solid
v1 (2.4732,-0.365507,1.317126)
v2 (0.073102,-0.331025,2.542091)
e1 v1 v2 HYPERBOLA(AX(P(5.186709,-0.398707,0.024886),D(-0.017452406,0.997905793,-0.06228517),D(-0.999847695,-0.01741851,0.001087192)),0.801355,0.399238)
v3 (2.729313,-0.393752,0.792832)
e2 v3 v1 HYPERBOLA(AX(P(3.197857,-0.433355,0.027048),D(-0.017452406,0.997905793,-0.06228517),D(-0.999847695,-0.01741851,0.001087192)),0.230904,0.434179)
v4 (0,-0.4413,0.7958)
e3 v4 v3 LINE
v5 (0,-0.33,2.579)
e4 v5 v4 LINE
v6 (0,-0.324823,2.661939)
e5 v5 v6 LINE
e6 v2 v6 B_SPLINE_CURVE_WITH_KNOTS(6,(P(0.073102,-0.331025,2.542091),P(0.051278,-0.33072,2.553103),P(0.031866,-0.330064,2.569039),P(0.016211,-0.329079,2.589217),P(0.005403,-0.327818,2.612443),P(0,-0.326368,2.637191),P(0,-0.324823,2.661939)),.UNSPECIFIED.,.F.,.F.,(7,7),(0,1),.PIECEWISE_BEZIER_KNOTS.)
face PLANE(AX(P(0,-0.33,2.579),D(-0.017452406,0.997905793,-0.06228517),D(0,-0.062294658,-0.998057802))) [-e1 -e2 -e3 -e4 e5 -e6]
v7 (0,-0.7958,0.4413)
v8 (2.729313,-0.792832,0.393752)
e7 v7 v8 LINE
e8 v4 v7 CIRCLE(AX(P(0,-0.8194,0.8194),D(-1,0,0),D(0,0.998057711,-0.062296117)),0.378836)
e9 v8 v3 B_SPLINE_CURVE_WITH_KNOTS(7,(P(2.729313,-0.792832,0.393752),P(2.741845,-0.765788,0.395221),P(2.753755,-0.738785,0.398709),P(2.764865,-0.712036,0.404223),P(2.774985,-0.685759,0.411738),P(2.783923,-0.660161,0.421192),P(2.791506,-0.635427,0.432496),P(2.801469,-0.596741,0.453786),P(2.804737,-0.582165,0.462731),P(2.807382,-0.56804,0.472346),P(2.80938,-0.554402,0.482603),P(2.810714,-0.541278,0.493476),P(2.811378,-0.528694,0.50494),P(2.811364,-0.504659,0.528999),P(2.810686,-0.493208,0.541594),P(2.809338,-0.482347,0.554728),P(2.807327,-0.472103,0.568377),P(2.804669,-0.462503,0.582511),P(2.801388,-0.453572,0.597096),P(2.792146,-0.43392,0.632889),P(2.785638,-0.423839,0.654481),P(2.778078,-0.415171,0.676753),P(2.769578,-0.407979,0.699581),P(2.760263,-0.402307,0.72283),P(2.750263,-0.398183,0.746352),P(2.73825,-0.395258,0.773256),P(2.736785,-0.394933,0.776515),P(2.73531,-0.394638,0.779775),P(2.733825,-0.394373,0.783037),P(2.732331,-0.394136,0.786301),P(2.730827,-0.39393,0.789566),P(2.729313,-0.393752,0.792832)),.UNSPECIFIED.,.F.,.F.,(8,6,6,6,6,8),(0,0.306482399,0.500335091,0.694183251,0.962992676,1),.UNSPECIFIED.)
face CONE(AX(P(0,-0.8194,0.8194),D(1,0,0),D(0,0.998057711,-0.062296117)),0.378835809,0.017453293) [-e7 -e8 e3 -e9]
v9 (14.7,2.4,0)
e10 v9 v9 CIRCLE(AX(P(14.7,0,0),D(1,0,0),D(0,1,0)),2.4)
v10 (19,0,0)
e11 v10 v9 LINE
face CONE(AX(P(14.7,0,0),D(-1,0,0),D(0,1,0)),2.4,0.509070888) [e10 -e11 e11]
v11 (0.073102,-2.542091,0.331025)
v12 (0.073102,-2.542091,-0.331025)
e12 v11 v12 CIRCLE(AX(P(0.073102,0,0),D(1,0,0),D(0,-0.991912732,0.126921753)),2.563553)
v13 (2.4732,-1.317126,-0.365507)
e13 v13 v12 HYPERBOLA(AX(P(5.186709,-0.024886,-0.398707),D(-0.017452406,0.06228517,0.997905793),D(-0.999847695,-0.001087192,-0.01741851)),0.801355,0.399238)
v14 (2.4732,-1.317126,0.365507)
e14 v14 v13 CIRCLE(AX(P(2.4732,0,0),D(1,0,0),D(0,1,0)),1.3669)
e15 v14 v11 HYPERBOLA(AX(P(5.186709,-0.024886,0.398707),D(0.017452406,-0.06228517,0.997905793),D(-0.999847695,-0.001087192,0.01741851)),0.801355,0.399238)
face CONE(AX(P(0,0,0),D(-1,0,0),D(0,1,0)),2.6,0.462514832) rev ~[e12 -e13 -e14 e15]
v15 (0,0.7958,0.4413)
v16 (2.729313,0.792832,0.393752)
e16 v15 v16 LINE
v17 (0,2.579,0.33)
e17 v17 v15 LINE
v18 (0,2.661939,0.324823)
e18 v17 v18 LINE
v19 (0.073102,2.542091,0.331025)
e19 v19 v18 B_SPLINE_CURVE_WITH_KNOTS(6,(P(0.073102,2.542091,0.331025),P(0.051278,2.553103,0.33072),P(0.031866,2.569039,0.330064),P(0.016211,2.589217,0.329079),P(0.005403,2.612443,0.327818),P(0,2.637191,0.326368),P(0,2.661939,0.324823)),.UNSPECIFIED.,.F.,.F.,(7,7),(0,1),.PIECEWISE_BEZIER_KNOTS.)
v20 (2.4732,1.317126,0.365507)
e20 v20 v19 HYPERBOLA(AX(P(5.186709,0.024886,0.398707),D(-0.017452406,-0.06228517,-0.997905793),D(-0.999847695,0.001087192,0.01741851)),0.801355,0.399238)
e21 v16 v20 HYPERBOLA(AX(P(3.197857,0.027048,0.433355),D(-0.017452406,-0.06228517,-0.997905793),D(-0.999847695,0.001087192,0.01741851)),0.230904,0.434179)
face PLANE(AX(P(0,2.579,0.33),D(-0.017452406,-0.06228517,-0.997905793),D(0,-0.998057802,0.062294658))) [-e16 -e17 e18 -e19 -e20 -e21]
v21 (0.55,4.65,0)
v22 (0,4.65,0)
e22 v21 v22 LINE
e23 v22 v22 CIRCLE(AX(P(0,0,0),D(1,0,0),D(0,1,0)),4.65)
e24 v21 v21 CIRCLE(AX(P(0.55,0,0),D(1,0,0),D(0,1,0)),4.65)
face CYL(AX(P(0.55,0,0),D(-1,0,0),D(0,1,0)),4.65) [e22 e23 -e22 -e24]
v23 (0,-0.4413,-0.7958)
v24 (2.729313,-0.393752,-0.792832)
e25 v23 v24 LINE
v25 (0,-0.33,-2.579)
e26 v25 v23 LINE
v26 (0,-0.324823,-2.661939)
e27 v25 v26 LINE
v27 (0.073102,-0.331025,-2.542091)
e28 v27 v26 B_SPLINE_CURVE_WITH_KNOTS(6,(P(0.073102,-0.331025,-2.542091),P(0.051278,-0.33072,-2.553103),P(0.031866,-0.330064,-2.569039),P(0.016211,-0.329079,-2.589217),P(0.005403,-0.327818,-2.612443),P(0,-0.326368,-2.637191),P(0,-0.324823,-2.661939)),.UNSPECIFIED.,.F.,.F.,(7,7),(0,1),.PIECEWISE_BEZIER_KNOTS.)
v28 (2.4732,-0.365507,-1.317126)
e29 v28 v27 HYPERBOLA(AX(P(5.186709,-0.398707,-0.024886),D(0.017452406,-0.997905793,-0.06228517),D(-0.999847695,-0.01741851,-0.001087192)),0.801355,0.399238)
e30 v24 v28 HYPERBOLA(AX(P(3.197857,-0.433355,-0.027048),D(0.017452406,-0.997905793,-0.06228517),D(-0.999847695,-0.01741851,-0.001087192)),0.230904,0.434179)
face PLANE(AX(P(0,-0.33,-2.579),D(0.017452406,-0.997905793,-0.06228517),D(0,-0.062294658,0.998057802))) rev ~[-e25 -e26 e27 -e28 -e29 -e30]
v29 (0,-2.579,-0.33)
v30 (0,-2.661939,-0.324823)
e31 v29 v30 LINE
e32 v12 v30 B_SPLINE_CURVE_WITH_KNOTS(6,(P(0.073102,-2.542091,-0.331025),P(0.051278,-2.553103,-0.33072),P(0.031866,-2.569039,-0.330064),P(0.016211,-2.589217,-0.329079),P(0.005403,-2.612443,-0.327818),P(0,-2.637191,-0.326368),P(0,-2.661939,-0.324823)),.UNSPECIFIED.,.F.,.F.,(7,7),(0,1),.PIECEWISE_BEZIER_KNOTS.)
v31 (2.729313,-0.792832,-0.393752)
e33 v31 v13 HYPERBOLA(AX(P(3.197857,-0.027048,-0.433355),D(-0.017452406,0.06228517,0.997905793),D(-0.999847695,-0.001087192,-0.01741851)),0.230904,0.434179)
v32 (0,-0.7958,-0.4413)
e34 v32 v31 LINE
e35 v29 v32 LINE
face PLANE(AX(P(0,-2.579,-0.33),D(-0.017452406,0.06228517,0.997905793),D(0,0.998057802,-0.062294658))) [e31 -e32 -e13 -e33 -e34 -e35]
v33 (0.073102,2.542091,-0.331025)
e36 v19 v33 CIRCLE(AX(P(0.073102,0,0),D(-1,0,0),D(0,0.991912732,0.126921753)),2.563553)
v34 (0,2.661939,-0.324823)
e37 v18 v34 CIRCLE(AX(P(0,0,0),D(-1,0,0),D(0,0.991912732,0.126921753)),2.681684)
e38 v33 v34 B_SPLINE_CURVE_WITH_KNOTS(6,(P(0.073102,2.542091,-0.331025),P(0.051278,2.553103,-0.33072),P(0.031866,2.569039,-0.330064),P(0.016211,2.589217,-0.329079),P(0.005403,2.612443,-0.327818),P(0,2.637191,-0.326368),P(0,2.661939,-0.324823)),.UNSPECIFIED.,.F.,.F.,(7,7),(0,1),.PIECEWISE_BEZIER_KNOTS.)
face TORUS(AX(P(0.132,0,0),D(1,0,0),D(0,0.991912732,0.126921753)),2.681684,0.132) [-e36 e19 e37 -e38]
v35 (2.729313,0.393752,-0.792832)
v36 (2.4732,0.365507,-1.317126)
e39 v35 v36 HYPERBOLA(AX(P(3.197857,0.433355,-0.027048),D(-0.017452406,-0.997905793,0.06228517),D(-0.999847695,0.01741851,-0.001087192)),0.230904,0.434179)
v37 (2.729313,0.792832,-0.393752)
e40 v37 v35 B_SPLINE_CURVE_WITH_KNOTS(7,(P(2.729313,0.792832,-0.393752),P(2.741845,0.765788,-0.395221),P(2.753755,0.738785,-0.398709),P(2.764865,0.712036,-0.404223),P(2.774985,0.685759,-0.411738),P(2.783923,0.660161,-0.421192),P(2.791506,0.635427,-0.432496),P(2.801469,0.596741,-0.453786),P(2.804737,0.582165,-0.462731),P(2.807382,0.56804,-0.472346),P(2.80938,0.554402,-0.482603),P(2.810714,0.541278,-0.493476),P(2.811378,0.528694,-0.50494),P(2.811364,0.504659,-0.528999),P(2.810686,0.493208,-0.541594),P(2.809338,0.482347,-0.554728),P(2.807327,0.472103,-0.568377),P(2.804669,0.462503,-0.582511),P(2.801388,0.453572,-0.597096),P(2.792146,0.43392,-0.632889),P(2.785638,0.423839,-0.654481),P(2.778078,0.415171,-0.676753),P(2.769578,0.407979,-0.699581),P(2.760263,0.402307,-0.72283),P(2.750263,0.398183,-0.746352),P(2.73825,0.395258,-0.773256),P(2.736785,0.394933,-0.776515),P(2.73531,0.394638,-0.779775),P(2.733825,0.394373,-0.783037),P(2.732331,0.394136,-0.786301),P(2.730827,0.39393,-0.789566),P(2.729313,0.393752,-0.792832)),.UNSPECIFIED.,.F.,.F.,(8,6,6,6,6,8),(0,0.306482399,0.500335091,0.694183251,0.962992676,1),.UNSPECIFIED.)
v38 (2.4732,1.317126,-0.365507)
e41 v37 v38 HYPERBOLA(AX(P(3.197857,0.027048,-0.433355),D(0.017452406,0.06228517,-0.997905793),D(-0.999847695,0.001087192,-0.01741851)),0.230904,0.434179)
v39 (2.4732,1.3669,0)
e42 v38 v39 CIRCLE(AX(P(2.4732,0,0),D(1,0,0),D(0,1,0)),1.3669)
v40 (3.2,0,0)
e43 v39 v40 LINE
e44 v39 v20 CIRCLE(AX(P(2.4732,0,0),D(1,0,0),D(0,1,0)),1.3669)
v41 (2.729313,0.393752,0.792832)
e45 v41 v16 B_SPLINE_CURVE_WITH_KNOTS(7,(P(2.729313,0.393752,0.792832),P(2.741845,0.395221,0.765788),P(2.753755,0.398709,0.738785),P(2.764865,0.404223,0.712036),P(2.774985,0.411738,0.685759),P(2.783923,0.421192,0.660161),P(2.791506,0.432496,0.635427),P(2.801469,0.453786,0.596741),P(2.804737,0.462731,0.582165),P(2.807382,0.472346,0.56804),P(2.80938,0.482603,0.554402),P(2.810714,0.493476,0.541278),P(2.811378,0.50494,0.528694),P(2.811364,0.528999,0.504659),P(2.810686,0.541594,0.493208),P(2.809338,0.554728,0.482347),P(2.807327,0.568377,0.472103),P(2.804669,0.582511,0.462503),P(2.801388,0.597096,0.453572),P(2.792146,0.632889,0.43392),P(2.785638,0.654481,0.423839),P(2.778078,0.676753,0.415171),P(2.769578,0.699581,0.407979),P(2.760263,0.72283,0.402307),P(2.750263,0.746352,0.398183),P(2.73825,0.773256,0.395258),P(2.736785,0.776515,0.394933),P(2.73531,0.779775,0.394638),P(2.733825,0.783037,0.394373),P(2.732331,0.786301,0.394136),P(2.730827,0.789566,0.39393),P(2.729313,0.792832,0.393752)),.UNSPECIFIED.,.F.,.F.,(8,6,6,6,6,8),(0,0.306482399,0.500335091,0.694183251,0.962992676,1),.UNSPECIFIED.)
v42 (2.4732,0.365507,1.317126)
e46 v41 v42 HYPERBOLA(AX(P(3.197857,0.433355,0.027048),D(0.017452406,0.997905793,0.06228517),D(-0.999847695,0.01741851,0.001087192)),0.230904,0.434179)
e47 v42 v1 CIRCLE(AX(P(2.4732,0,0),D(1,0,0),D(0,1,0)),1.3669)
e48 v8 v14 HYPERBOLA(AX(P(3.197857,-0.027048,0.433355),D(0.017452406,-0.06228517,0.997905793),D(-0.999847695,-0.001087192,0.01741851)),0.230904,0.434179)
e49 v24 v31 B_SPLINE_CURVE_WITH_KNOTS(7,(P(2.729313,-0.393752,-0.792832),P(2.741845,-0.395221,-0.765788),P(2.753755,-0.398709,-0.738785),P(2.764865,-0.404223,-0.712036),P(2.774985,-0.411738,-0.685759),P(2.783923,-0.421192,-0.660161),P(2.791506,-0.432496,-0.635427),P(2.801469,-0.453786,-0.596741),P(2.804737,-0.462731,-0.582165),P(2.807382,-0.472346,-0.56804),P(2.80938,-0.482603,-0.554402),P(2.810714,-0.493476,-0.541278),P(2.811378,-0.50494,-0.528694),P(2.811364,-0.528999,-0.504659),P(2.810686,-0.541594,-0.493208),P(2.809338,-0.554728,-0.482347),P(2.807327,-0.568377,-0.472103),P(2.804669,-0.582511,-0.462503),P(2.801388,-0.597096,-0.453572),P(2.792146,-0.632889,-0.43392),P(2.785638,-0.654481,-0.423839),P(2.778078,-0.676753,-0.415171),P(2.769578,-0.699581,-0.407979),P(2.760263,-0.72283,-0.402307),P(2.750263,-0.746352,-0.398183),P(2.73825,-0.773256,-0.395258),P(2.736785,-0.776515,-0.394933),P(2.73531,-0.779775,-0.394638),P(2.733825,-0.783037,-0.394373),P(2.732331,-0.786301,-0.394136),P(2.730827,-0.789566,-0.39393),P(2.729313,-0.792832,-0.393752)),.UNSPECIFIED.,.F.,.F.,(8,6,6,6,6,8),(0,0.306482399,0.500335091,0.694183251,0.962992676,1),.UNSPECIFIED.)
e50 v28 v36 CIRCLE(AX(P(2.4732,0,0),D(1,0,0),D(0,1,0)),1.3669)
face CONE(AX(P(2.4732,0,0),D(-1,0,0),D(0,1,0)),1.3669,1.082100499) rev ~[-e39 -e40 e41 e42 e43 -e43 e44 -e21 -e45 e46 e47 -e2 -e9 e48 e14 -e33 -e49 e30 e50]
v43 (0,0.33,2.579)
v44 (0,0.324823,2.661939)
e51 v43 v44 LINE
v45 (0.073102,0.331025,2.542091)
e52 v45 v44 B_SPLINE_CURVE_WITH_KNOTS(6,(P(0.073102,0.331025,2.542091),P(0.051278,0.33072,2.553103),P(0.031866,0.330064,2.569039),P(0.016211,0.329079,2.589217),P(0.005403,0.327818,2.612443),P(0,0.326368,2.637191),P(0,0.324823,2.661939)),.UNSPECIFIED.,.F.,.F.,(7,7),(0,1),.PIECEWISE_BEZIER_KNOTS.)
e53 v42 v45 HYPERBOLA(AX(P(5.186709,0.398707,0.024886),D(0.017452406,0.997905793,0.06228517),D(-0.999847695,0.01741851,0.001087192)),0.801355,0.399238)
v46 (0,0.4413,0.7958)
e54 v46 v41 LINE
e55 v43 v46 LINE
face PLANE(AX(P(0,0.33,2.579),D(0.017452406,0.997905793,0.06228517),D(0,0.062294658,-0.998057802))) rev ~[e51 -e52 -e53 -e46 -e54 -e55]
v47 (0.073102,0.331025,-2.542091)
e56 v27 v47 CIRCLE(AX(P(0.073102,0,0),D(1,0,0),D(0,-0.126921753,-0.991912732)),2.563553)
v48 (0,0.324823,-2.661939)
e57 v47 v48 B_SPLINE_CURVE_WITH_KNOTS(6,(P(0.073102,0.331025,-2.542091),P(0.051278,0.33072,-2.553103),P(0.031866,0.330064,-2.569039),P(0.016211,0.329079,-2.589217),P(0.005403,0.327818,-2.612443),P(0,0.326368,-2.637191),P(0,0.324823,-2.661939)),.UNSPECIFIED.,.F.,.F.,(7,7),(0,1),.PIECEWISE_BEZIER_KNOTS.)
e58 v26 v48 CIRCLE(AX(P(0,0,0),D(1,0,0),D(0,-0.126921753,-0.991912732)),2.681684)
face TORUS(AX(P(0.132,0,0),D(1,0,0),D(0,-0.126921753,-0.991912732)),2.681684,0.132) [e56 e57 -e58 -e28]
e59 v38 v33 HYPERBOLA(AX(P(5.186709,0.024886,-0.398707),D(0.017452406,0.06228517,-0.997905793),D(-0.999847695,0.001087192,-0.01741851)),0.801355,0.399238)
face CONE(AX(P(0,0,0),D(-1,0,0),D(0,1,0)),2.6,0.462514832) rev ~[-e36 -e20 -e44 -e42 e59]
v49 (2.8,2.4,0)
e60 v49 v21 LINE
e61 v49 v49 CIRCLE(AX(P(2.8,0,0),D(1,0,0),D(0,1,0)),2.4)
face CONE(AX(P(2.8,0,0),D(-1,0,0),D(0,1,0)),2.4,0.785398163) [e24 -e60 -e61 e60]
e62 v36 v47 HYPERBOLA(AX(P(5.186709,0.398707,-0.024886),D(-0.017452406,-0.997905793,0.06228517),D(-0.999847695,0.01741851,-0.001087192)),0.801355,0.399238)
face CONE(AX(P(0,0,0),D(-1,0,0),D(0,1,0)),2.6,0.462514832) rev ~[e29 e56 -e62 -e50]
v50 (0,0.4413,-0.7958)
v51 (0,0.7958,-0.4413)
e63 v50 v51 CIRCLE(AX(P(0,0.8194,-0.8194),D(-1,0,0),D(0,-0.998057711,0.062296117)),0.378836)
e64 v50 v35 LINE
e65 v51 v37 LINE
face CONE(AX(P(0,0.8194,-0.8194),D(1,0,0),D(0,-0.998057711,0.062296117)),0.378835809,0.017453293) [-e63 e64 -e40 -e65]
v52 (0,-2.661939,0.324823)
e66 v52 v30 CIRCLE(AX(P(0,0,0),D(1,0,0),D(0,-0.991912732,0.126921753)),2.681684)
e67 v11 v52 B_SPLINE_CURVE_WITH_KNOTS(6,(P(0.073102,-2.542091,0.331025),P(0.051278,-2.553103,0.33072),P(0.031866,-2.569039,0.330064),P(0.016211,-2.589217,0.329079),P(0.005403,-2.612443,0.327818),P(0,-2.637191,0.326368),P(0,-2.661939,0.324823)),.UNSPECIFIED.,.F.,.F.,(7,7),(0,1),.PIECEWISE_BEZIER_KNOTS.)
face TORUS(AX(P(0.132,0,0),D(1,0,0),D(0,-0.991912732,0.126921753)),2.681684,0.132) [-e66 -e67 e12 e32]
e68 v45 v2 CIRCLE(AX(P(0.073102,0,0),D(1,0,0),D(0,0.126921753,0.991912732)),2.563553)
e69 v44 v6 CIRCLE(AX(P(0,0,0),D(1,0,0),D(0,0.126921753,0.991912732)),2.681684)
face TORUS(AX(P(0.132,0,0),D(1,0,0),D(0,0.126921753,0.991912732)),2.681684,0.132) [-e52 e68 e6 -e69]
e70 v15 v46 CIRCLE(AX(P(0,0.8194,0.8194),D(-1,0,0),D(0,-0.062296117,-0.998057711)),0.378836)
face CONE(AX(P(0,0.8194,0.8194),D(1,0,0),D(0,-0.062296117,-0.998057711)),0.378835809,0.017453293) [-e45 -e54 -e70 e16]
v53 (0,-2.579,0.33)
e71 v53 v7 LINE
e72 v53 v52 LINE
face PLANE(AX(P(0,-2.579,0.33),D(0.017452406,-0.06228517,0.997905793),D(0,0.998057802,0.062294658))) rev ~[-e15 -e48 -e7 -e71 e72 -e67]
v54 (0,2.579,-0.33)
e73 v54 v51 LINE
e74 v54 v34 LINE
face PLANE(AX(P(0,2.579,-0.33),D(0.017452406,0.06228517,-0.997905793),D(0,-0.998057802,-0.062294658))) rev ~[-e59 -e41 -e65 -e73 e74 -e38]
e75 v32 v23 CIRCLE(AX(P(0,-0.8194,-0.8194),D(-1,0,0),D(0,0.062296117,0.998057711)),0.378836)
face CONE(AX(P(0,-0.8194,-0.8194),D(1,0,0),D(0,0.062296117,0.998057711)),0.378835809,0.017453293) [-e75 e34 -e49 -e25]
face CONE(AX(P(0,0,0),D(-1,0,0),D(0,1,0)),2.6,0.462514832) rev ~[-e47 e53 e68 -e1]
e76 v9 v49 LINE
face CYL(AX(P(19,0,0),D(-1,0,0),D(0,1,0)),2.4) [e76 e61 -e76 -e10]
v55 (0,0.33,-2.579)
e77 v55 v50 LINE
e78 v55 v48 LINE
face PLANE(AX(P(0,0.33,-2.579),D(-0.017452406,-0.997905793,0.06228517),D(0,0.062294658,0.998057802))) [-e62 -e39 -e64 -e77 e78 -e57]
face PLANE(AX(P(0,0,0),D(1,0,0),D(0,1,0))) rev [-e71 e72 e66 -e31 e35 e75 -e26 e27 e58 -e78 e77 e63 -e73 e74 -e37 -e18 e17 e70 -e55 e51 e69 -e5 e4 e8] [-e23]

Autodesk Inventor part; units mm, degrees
ref_plane "YZ Plane" through (0, 0, 0) normal (1, 0, 0) x (0, 1, 0)
ref_plane "XZ Plane" through (0, 0, 0) normal (0, 1, 0) x (-1, 0, 0)
sketch "Sketch1" plane through (0, 0, 0) normal (0, 0, 1) x (1, 0, 0)
  line L0 (3.2, 0) -> (19, 0)
  line L1 (19, 0) -> (19, 2.4)
  line L2 (19, 2.4) -> (2.8, 2.4)
  line L3 (0.55, 4.65) -> (0, 4.65)
  line L4 (-3.8, 0) -> (22.8, 0) projected
  line L5 (0, -0.93) -> (0, 5.58) projected
  line L6 (0, 2.6) -> (2.4732, 1.3669)
  line L7 (2.4732, 1.3669) -> (3.2, 0)
  line L8 (2.8, 2.4) -> (0.55, 4.65)
  line L9 (0, 4.65) -> (0, 2.6)
  dimension "d2" = 4.8
  dimension "d3" = 9.3
  dimension "d4" = 3.2
  dimension "d5" = 5.2
  dimension "d6" = 26.5
  dimension "d7" = 62
  dimension "d13" = 45
  dimension "d14" = 2.8
  dimension "d15" = 19
revolve "Body" add sketch "Sketch1" angle 360 about axis through (3.2, 0, 0) along (1, 0, 0) contours L7 L6 L5 L3 L8 L2 L1 L0
sketch "Sketch2" plane through (0, 0, 0) normal (-1, 0, 0) x (0, 0, 1)
  line L0 (0, -6.51) -> (0, 6.51) projected
  line L1 (-6.51, 0) -> (6.51, 0) projected
  line L2 (0, 2.6) -> (0, 0) construction
  line L3 (0, 0) -> (2.6, 0) construction
  arc A0 (0.78, 0) -> (0, 0.78) centre (0, 0) ccw construction
  line L4 (0, 0) -> (3.288, 3.288) construction
  arc A1 (0.91, 0) -> (0, 0.91) centre (0, 0) ccw construction
  line L5 (0.33, 2.579) -> (0.4413, 0.7958)
  line L6 (2.579, 0.33) -> (0.7958, 0.4413)
  arc A2 (0.4413, 0.7958) -> (0.7958, 0.4413) centre (0.8194, 0.8194) ccw
  arc A3 (2.6, 0) -> (2.579, 0.33) centre (0, 0) ccw
  arc A4 (0.33, 2.579) -> (0, 2.6) centre (0, 0) ccw
  arc A5 (2.579, 0.33) -> (0.33, 2.579) centre (0, 0) ccw
  line L7 (0.33, -2.579) -> (0.4413, -0.7958)
  line L8 (2.579, -0.33) -> (0.7958, -0.4413)
  arc A6 (0.7958, -0.4413) -> (0.4413, -0.7958) centre (0.8194, -0.8194) ccw
  arc A7 (2.579, -0.33) -> (2.6, 0) centre (0, 0) ccw
  arc A8 (0, -2.6) -> (0.33, -2.579) centre (0, 0) ccw
  arc A9 (0.33, -2.579) -> (2.579, -0.33) centre (0, 0) ccw
  line L9 (-0.33, 2.579) -> (-0.4413, 0.7958)
  line L10 (-2.579, 0.33) -> (-0.7958, 0.4413)
  arc A10 (-0.7958, 0.4413) -> (-0.4413, 0.7958) centre (-0.8194, 0.8194) ccw
  arc A11 (-2.579, 0.33) -> (-2.6, 0) centre (0, 0) ccw
  arc A12 (0, 2.6) -> (-0.33, 2.579) centre (0, 0) ccw
  arc A13 (-0.33, 2.579) -> (-2.579, 0.33) centre (0, 0) ccw
  arc A14 (-2.579, -0.33) -> (-0.33, -2.579) centre (0, 0) ccw
  arc A15 (-0.33, -2.579) -> (0, -2.6) centre (0, 0) ccw
  arc A16 (-2.6, 0) -> (-2.579, -0.33) centre (0, 0) ccw
  line L11 (-2.579, -0.33) -> (-0.7958, -0.4413)
  arc A17 (-0.4413, -0.7958) -> (-0.7958, -0.4413) centre (-0.8194, -0.8194) ccw
  line L12 (-0.33, -2.579) -> (-0.4413, -0.7958)
  circle A18 centre (0, 0) radius 4.65 projected
  circle A19 centre (0, 0) radius 2.6 projected
  dimension "d18" = 45
  dimension "d19" = 1.56
  dimension "d20" = 1.82
  dimension "d21" = 5.2
  dimension "d22" = 0.33
extrude "Slot" add sketch "Sketch2" against normal up to next draft 1 contours L7 A6 L8 A9 | A14 L11 A17 L12 | A13 L9 A10 L10 | L6 A2 L5 A5
fillet "Fillet1" radius 0.132 4 edges at (0, 2.6, 0) (0, 0, 2.6) (0, -2.6, 0) (0, 0, -2.6)
thread "Thread" size "4.8x1.6" class "6g" standard "Metric Forming Screw Threads" length 16.2
chamfer "Chamfer1" distance 2.4 distance2 4.3 1 edges at (19, -2.4, 0) measured on face at (19, 0.5988, 0.9655)
ref_plane "Work Plane2" through (2.8, 0, 0) normal (0, 1, 0) x (1, 0, 0)
equation "\"d2\" = NND"
equation "\"d3\" = KOD"
equation "\"d4\" = STI"
equation "\"d5\" = SDM"
equation "\"d13\" = 0.5 * SEWI"
equation "\"d14\" = KOH"
equation "\"d15\" = NLG"
equation "\"d19\" = 0.3 * SDM"
equation "\"d20\" = 0.35 * SDM"
equation "\"d21\" = SDM"
equation "\"d22\" = 0.5 * SBR"
equation "\"d45\" = STI"
equation "\"d25\" = 0.2 * SBR"
equation "\"d9\" = GEL"
equation "\"d11\" = -0.5 * GD2 + 0.5 * NND"
equation "\"d12\" = SPTZ"
equation "\"NND\" = 4.8"
equation "\"NLG\" = 19"
equation "\"GEL\" = 16.2"
equation "\"KOD\" = 9.3"
equation "\"KOH\" = 2.8"
equation "\"SDM\" = 5.2"
equation "\"STI\" = 3.2"
equation "\"SBR\" = 0.66"
equation "\"SPTZ\" = 4.3"
equation "\"GD2\" = 0"
equation "\"SEWI\" = 90deg"
equation "\"d0\" = NLG"
equation "\"d1\" = KOH"
equation "\"d17\" = SDM"
equation "\"EPV\" = 5.2"
equation "\"THREADDIA\" = 4.8"
equation "\"TOA\" = 30deg"
equation "\"PTC\" = 1.6"
equation "\"GD1\" = 3.58"
properties part number "ISO 7050 - ST 4.8 x 19 - C - H" material "Steel"
